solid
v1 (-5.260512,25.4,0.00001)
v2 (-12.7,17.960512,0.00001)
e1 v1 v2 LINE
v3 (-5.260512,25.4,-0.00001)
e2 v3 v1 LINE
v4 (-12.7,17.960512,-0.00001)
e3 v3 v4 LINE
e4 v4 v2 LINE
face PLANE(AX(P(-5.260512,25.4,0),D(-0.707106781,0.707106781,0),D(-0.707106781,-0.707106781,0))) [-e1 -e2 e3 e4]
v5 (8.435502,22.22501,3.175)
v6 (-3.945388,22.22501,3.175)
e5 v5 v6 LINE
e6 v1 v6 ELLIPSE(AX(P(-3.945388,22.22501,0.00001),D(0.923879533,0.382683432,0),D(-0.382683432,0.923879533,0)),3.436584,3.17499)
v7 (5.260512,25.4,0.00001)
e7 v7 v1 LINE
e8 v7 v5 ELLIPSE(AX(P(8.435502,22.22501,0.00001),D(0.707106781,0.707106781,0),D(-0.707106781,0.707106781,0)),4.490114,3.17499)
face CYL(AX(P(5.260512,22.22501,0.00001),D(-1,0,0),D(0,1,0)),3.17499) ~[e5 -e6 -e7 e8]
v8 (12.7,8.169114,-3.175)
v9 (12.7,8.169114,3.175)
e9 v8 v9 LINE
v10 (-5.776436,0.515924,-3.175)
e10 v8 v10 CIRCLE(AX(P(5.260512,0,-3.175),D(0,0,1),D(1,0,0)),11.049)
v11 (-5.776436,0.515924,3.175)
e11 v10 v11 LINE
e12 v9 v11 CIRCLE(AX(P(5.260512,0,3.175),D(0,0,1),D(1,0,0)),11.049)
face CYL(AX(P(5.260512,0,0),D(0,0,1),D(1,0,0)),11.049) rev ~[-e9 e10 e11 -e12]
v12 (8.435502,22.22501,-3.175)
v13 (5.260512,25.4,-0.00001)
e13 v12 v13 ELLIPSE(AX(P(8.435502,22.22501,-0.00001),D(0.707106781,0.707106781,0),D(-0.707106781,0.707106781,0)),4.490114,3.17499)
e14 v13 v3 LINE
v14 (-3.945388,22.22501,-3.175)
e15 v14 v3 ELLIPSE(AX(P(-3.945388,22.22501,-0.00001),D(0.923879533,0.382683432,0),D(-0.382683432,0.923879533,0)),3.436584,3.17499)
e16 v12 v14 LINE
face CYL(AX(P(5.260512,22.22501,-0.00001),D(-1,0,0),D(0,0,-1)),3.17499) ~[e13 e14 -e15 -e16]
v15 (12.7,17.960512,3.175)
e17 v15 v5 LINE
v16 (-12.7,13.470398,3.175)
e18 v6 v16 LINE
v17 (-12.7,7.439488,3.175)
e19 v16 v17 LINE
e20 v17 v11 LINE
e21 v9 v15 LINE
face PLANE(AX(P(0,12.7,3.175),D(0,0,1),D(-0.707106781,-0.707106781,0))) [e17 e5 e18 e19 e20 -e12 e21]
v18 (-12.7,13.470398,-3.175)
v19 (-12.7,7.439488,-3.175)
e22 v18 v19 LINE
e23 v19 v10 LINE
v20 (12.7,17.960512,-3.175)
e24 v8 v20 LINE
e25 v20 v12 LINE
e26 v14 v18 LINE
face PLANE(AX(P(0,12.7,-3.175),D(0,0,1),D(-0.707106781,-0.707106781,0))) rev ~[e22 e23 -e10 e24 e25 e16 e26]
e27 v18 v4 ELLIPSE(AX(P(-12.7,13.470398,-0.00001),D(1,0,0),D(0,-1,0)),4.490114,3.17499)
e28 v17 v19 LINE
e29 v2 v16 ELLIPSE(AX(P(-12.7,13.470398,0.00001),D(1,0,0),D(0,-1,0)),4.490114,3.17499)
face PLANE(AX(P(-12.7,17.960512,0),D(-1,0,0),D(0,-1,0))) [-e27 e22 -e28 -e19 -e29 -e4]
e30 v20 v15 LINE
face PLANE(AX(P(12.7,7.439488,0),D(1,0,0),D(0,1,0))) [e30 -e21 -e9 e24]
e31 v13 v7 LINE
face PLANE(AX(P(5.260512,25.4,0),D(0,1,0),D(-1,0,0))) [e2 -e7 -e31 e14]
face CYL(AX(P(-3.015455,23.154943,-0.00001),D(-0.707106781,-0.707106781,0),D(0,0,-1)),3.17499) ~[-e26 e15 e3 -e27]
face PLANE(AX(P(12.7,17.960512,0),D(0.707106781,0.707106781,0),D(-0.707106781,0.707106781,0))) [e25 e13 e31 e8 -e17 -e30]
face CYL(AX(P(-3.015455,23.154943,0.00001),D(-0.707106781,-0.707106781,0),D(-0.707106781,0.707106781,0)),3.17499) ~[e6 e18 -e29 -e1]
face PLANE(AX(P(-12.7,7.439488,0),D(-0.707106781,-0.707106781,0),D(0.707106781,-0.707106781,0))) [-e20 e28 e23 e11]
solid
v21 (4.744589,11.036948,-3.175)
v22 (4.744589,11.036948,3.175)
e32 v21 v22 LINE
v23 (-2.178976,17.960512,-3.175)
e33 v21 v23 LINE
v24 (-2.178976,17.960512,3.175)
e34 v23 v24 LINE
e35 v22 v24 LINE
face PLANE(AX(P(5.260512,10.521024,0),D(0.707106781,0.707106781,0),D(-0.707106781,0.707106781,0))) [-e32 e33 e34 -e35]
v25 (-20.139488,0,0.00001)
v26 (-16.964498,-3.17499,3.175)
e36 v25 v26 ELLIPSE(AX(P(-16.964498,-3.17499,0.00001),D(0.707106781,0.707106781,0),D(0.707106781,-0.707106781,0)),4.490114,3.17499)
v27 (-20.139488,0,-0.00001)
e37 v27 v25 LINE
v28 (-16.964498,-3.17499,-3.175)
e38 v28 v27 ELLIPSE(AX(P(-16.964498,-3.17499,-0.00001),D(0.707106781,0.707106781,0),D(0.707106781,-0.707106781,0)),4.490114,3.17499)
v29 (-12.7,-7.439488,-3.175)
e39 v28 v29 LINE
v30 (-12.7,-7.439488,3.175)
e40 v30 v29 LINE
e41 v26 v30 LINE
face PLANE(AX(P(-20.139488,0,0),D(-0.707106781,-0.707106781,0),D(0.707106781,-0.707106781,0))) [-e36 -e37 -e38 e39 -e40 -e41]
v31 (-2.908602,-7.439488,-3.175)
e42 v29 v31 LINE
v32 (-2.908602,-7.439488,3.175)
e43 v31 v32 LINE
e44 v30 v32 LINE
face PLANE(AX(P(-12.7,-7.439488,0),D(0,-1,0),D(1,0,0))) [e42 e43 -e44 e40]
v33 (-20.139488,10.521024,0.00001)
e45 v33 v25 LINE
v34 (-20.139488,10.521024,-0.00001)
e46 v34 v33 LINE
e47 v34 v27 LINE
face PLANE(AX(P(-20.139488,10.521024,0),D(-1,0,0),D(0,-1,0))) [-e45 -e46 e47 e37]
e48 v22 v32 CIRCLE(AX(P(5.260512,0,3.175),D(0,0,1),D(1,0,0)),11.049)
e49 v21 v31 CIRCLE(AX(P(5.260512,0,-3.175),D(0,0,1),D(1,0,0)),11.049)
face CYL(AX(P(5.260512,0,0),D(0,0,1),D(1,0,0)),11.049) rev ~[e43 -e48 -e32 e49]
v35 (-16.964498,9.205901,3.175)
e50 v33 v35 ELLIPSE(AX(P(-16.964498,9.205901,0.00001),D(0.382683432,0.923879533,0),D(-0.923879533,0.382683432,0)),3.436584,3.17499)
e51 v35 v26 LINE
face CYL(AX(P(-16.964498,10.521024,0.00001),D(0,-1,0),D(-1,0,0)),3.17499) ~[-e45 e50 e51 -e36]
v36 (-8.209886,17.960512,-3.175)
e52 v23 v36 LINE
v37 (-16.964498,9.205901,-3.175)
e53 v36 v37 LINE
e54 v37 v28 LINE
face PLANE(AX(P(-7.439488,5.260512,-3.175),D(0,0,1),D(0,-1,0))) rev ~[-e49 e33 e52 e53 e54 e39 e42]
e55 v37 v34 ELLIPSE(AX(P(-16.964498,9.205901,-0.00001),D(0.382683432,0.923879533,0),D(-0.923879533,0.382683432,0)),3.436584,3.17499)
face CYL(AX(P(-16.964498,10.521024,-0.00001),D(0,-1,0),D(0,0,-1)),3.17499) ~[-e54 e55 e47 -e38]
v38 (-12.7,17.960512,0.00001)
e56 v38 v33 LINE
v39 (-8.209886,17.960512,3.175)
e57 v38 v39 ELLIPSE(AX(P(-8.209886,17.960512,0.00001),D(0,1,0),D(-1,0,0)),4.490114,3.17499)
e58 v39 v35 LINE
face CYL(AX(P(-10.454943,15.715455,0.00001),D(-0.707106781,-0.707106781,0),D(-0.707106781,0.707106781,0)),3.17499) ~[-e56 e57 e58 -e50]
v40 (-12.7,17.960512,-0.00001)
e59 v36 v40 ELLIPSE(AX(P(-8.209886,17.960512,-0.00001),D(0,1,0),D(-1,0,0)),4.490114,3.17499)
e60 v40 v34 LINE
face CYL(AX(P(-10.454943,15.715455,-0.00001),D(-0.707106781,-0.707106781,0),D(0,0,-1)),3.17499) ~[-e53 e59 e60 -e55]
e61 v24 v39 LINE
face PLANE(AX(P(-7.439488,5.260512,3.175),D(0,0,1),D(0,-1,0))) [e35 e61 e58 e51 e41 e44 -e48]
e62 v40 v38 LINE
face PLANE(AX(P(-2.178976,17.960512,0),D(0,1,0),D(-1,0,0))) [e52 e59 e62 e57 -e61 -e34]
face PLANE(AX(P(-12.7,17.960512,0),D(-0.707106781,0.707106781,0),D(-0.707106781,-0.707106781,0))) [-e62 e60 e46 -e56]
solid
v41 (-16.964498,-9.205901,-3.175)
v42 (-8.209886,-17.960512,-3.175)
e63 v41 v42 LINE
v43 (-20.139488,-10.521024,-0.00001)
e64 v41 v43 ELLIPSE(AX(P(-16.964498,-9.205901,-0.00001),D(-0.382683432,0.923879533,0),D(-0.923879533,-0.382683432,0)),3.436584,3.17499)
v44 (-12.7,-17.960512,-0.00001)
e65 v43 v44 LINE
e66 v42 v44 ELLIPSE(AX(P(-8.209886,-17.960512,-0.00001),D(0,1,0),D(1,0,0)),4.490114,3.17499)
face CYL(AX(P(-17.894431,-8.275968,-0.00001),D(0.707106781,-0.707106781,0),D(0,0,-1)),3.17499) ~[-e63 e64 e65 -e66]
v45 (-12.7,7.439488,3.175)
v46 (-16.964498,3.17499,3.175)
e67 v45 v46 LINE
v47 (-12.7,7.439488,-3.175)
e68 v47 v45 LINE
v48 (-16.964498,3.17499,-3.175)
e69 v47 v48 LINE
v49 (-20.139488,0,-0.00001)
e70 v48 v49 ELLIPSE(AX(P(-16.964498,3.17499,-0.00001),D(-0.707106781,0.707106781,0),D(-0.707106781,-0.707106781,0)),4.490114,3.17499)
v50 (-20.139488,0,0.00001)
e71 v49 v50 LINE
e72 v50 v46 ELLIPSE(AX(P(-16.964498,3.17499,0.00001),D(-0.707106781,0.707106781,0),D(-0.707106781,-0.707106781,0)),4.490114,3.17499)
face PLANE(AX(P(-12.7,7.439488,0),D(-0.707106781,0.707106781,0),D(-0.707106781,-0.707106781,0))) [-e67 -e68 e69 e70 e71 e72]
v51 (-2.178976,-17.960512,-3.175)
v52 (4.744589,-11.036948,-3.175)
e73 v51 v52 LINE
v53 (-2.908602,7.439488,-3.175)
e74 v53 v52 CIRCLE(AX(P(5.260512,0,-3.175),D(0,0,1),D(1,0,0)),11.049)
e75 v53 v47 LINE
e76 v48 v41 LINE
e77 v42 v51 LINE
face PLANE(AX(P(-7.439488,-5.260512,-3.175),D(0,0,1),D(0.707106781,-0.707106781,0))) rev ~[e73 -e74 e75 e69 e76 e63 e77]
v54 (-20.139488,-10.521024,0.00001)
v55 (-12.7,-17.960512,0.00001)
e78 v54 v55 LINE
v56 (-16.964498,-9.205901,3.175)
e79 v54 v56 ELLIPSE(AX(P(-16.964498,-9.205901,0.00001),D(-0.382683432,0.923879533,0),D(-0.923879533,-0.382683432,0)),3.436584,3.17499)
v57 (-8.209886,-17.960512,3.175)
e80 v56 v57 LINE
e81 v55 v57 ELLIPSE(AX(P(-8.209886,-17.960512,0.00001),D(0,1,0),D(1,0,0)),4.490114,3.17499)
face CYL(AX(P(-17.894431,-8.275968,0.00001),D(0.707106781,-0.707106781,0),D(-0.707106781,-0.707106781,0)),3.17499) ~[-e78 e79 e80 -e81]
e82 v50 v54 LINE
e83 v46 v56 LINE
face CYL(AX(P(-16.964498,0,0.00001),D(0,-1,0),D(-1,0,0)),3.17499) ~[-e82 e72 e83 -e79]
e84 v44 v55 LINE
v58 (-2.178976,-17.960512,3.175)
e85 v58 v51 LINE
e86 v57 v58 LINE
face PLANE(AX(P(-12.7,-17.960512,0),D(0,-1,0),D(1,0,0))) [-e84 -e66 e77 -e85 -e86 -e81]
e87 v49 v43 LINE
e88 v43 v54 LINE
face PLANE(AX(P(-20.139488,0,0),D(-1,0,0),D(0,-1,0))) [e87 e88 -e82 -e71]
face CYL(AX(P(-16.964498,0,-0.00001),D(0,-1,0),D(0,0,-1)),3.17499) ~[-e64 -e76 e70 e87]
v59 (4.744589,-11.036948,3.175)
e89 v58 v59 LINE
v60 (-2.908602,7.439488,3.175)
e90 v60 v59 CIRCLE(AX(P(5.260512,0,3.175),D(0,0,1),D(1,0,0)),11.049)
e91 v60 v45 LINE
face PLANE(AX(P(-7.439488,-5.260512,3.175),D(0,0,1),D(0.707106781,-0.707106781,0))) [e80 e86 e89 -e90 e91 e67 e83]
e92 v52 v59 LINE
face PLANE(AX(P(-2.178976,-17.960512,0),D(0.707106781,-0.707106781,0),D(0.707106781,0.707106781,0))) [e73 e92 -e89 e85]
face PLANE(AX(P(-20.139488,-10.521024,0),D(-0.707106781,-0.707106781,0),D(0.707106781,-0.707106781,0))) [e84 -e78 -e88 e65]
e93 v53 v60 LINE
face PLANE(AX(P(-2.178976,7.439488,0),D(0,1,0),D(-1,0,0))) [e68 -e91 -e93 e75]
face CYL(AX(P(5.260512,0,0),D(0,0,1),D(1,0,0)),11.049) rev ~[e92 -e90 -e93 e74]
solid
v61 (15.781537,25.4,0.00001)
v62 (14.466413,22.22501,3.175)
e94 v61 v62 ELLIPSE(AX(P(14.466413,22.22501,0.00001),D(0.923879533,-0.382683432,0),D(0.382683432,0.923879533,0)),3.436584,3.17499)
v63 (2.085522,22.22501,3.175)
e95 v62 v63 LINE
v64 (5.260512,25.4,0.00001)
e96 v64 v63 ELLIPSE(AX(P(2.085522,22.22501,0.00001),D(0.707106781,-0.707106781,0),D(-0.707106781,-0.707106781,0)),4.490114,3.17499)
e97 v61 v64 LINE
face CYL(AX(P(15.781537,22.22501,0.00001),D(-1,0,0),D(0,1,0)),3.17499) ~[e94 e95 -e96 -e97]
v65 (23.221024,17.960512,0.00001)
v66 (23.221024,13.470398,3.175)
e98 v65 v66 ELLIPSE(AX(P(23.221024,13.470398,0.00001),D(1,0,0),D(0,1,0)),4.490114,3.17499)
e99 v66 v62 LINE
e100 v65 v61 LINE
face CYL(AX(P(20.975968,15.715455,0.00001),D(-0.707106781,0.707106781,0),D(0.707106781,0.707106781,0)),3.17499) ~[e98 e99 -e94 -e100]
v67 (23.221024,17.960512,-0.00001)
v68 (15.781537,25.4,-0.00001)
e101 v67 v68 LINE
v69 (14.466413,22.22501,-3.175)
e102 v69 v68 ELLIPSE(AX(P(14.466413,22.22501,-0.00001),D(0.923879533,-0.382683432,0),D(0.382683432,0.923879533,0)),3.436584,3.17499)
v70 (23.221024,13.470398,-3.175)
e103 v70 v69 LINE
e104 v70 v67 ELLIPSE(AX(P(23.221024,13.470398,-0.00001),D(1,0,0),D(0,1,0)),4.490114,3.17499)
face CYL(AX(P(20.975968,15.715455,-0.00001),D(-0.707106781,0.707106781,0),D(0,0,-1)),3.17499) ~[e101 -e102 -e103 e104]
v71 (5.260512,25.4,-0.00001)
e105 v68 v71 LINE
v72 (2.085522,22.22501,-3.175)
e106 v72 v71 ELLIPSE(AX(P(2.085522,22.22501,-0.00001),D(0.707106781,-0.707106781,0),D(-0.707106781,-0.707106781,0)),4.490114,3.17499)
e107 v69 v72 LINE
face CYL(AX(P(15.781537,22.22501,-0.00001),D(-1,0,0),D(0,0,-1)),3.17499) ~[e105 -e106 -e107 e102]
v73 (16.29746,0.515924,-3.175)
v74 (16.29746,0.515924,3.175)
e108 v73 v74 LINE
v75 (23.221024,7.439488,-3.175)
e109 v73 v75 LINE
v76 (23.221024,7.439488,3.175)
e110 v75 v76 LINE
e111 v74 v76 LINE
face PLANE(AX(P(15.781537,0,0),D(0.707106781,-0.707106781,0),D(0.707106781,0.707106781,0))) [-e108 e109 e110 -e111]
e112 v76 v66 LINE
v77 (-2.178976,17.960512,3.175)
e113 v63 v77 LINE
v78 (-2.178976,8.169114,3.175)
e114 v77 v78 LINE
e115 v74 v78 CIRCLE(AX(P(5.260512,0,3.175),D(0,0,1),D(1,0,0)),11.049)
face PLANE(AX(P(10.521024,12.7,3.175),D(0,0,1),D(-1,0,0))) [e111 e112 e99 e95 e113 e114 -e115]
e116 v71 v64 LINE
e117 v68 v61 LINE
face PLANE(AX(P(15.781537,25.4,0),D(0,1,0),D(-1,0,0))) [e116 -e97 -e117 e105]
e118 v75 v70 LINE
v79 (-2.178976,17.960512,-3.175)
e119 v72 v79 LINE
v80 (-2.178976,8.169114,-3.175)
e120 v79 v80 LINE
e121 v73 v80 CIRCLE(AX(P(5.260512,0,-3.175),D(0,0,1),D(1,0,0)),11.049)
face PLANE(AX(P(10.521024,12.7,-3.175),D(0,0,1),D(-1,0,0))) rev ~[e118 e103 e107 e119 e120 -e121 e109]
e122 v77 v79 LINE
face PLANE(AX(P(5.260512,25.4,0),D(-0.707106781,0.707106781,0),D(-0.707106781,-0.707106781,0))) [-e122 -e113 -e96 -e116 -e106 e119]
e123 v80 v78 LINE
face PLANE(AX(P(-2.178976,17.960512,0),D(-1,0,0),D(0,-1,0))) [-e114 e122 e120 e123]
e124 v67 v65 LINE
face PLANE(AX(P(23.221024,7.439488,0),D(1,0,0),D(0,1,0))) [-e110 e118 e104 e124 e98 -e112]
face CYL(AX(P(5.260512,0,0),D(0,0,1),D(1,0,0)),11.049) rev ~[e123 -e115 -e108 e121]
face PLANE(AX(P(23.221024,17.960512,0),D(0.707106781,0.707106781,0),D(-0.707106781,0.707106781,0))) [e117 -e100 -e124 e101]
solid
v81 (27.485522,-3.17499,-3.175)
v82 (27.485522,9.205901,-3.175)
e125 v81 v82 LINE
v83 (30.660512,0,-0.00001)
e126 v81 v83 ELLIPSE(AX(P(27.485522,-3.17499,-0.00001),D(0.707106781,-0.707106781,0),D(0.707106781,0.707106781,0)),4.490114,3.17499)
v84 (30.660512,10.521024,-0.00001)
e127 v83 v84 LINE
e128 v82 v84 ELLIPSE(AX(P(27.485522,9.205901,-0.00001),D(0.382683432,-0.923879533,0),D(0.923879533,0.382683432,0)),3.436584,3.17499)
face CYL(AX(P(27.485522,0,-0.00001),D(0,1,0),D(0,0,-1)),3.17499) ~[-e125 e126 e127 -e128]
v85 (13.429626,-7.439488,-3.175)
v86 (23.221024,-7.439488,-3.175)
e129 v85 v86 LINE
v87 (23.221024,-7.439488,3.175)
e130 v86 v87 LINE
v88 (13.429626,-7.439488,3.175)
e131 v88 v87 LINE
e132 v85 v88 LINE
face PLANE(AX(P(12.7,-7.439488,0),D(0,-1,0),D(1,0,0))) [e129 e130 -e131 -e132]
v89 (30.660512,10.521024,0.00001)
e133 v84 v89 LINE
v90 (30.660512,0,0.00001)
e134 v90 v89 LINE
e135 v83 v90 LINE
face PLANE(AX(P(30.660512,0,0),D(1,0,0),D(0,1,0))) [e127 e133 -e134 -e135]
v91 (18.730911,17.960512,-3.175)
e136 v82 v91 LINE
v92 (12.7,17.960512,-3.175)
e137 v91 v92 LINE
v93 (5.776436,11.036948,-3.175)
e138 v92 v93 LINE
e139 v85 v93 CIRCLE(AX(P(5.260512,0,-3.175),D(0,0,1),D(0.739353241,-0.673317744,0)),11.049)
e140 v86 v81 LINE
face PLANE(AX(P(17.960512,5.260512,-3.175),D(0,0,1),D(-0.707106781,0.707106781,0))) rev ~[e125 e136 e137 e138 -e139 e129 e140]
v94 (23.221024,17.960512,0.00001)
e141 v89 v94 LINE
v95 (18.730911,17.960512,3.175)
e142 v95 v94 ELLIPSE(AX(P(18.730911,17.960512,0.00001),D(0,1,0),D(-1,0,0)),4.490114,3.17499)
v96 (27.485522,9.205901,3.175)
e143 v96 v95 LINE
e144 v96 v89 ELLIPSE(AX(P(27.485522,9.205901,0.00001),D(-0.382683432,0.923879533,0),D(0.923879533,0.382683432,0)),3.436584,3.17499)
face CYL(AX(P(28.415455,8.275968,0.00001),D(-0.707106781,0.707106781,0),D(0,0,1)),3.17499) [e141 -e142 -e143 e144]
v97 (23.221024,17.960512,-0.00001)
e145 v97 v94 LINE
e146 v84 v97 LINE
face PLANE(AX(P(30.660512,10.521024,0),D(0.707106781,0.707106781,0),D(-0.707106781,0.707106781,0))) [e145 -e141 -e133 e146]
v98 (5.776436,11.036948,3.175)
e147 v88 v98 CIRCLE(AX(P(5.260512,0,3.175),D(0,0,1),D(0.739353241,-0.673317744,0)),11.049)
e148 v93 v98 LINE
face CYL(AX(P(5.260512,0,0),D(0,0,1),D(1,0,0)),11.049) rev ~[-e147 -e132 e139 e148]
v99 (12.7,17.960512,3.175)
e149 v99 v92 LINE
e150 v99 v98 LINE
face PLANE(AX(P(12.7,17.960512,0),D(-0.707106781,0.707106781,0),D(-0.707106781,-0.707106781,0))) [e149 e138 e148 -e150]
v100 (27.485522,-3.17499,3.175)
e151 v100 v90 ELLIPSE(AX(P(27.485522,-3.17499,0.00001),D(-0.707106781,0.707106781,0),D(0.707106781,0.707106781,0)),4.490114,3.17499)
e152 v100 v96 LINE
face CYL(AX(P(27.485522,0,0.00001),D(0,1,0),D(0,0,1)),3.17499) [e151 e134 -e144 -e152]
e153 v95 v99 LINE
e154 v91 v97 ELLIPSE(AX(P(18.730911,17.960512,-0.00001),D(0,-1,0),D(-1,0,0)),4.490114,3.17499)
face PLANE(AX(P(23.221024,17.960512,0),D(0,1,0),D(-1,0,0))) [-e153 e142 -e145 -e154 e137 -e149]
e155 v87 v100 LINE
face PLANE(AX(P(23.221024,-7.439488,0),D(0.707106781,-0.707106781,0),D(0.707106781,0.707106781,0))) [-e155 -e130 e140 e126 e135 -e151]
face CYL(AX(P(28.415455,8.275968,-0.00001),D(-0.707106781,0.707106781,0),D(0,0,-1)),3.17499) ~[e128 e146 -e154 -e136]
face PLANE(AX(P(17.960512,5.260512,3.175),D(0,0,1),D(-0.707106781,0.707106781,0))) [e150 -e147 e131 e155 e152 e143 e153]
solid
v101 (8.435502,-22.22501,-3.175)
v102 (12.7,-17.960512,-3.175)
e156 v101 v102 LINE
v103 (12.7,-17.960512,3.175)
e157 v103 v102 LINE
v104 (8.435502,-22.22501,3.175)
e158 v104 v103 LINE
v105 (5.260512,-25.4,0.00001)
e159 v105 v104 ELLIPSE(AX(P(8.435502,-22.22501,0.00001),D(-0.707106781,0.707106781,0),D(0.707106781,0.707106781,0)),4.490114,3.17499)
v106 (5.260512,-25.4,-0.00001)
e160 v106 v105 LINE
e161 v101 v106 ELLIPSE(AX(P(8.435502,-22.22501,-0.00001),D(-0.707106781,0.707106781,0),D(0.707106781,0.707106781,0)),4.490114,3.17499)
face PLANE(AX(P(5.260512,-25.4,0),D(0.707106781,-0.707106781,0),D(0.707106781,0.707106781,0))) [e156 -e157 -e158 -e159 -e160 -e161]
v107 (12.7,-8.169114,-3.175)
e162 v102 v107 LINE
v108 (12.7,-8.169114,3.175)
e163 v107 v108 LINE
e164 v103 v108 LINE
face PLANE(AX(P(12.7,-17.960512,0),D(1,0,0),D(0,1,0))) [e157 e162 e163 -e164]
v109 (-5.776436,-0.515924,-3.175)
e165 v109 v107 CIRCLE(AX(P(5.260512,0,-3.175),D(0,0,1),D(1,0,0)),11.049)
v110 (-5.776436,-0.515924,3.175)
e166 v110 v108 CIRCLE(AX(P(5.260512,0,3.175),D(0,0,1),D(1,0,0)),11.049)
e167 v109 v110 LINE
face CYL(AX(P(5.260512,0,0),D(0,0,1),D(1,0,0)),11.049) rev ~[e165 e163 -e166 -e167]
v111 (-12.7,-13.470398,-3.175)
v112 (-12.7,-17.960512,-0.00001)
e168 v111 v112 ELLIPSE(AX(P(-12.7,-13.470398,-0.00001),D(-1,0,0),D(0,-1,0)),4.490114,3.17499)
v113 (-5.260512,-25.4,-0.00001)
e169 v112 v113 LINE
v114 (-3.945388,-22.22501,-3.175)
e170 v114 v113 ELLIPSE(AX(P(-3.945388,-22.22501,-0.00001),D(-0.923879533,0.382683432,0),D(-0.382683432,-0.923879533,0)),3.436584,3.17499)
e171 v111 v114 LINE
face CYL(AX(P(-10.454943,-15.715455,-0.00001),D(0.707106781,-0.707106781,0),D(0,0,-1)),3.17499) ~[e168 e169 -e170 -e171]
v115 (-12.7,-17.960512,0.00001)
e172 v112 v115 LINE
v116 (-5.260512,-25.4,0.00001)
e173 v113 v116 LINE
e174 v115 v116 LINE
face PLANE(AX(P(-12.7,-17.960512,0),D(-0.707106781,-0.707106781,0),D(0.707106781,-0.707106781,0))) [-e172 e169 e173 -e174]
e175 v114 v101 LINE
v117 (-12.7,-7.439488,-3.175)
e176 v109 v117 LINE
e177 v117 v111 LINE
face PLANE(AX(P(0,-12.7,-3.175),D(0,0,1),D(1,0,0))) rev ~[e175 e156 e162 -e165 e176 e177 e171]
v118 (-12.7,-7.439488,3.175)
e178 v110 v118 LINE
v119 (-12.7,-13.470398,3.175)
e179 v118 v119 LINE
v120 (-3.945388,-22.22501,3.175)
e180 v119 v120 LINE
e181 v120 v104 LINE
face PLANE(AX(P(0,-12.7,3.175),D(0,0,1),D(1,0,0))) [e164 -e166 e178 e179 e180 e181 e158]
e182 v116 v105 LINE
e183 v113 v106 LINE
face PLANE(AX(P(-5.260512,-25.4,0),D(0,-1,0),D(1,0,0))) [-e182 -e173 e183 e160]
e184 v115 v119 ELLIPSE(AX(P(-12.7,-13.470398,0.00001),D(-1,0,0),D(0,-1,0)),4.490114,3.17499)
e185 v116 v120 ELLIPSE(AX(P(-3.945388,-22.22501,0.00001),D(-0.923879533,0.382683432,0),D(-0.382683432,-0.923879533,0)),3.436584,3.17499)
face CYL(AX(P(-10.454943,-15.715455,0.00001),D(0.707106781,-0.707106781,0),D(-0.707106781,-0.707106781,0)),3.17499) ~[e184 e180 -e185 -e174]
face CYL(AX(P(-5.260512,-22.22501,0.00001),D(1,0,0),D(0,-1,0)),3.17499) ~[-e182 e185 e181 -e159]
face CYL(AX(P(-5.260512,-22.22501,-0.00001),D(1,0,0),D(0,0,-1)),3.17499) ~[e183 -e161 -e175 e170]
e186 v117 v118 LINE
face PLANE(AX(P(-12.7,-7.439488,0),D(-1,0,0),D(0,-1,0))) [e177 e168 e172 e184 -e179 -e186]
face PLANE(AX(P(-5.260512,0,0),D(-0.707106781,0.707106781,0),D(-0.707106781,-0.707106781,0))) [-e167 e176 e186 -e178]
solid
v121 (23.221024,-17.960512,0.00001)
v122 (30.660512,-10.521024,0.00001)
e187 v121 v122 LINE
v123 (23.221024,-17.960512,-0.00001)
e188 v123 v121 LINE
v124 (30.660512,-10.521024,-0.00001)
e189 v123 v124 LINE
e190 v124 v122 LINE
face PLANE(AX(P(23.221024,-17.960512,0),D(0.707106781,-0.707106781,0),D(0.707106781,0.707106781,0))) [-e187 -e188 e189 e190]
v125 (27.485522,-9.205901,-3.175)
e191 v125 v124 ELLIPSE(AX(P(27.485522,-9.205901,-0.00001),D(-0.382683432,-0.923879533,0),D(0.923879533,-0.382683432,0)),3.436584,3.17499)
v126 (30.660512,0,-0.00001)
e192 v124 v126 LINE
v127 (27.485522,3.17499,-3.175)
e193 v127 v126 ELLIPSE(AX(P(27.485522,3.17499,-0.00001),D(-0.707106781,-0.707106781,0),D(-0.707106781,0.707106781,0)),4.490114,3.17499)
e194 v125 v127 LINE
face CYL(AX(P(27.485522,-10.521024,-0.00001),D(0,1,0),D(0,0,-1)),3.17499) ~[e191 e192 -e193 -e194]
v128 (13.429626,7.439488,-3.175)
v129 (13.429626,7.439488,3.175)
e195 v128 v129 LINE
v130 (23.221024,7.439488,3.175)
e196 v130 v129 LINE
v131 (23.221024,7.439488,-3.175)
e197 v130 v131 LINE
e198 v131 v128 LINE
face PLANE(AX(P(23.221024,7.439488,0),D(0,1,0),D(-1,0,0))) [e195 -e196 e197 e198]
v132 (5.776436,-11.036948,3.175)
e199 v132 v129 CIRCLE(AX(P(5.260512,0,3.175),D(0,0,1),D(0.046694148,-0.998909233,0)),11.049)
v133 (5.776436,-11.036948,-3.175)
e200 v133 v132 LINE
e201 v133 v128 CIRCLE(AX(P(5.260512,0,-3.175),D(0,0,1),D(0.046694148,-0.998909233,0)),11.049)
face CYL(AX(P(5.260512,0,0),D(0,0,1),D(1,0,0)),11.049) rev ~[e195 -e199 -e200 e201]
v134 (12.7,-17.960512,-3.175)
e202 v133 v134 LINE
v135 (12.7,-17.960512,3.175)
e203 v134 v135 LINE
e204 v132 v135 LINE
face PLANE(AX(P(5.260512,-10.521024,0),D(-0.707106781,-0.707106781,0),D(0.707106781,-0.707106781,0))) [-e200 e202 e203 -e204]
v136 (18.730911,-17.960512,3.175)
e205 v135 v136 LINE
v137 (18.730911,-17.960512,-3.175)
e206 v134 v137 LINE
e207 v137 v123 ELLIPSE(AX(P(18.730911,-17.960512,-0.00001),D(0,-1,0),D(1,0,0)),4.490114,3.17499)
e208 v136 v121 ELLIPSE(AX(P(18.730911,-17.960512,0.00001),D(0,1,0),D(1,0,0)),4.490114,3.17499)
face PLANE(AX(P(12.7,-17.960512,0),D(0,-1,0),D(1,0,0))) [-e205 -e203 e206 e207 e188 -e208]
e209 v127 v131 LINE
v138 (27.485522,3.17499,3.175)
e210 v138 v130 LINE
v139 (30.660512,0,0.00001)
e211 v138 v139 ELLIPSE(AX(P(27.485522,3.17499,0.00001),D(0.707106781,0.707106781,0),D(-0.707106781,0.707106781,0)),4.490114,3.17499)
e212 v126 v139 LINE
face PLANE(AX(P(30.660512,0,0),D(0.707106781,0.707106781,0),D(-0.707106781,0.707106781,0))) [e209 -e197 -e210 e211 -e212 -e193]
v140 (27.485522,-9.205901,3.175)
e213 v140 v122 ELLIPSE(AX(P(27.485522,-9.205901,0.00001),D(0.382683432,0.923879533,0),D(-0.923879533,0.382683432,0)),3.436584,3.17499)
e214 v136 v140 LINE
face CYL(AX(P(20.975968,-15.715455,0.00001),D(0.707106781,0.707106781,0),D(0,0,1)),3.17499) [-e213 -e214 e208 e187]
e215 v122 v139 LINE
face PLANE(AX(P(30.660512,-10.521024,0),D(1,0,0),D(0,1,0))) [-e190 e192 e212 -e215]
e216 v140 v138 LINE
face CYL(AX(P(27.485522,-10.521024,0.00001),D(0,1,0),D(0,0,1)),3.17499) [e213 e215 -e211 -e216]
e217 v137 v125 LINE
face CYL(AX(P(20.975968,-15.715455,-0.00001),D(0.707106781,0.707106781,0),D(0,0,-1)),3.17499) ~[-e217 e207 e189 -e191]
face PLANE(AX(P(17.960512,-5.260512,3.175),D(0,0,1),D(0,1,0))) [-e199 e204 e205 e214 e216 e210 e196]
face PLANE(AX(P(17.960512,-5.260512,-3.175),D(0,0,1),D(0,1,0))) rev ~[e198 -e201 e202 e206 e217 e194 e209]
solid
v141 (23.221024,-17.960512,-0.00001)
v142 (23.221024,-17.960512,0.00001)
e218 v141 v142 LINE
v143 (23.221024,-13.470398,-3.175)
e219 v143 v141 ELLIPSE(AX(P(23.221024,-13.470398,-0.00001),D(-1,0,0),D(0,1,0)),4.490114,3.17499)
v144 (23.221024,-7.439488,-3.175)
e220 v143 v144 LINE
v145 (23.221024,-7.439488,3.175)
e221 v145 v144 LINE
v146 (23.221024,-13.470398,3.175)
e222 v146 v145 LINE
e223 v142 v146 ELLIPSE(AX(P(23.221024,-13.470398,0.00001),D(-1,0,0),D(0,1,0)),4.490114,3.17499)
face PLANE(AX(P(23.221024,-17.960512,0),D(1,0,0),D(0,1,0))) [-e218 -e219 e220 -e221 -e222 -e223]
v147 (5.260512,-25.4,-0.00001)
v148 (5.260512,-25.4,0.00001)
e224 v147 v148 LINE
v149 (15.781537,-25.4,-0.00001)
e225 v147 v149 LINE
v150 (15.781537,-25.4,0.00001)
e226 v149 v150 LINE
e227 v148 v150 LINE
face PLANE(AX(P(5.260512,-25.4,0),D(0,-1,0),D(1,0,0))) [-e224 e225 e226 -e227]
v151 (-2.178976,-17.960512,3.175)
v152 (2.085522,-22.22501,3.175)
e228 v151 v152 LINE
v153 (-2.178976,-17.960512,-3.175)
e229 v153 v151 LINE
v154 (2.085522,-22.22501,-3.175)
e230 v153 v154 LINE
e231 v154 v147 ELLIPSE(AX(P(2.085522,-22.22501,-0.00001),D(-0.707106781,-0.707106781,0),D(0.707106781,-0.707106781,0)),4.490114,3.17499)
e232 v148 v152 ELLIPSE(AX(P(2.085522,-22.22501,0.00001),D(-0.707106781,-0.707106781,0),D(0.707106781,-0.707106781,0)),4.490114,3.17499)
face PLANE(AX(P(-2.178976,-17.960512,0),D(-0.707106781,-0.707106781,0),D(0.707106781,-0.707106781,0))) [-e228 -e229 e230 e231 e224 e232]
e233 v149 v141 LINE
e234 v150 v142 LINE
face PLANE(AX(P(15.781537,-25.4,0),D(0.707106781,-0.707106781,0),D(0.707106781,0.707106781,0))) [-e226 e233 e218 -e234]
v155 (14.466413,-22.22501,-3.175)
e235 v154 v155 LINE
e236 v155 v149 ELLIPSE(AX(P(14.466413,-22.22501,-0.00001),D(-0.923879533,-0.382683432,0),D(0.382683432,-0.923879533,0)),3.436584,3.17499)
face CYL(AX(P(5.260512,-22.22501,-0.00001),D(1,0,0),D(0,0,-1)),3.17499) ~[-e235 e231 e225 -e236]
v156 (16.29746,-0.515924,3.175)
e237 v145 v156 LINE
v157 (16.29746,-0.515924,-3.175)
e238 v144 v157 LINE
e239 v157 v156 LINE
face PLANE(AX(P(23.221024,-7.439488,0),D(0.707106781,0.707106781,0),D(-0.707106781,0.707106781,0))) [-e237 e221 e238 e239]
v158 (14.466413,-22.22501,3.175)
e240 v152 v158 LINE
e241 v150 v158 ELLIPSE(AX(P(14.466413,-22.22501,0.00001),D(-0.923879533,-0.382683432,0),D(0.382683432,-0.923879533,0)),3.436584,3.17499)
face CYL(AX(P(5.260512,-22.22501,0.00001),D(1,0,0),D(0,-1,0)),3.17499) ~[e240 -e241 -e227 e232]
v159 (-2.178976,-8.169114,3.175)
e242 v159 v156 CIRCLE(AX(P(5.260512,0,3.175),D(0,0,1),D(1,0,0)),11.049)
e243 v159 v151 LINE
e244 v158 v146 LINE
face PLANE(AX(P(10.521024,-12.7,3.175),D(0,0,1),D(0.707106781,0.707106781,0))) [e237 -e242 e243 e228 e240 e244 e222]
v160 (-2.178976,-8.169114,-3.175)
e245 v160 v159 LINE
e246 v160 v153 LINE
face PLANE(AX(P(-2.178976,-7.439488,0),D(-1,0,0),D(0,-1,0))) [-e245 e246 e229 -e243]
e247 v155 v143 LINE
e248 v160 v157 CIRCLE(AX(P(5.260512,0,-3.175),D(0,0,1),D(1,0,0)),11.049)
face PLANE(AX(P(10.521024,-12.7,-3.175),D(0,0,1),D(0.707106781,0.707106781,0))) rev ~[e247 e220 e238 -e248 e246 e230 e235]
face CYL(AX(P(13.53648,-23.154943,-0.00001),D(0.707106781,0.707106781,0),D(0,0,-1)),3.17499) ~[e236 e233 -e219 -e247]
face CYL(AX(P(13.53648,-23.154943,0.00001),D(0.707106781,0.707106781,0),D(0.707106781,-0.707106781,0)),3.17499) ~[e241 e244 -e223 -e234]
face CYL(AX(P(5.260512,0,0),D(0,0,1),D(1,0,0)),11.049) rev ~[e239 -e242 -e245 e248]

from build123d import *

# Parameters (mm, degrees)
F1_DEPTH = 3.175
F2_COUNT = 8
F3_R     = 11.049
F4_DEPTH = 12.7
F5_R     = 3.17499
F5_2_R   = 3.17499
F5_3_R   = 3.17499
F5_4_R   = 3.17499
F5_5_R   = 3.17499
F5_6_R   = 3.17499
F5_7_R   = 3.17499
F5_8_R   = 3.17499


# Not quite as in the source:
# - a fillet or chamfer is up to 0.001 mm smaller than in the source, because OpenCascade refuses the exact size


with BuildPart() as f1:
    # F0 (on Top) → F1 (new body, symmetric)
    with BuildSketch(Plane.XY):
        Polygon((5.2605122421, 0), (-5.2605122421, 0), (-12.7, -7.4394877579), (-12.7, -17.9605122421), (-5.2605122421, -25.4), (5.2605122421, -25.4), (12.7, -17.9605122421), (12.7, -7.4394877579), align=None)
    extrude(amount=F1_DEPTH, both=True)


with BuildPart() as f2_1:
    # F2: instance of F1
    add(f1.part.rotate(Axis((5.2605122421, 0, 0), (0, 0, 1)), 1 * 360 / F2_COUNT))


with BuildPart() as f2_2:
    # F2: instance of F1
    add(f1.part.rotate(Axis((5.2605122421, 0, 0), (0, 0, 1)), 2 * 360 / F2_COUNT))


with BuildPart() as f2_3:
    # F2: instance of F1
    add(f1.part.rotate(Axis((5.2605122421, 0, 0), (0, 0, 1)), 3 * 360 / F2_COUNT))


with BuildPart() as f2_4:
    # F2: instance of F1
    add(f1.part.rotate(Axis((5.2605122421, 0, 0), (0, 0, 1)), 4 * 360 / F2_COUNT))


with BuildPart() as f2_5:
    # F2: instance of F1
    add(f1.part.rotate(Axis((5.2605122421, 0, 0), (0, 0, 1)), 5 * 360 / F2_COUNT))


with BuildPart() as f2_6:
    # F2: instance of F1
    add(f1.part.rotate(Axis((5.2605122421, 0, 0), (0, 0, 1)), 6 * 360 / F2_COUNT))


with BuildPart() as f2_7:
    # F2: instance of F1
    add(f1.part.rotate(Axis((5.2605122421, 0, 0), (0, 0, 1)), 7 * 360 / F2_COUNT))


with BuildPart() as f4_tool:
    # F3 (on Top) → F4 (new body, symmetric)
    with BuildSketch(Plane.XY):
        with Locations((5.2605122421, 0)):
            Circle(F3_R)
    extrude(amount=F4_DEPTH, both=True)


with BuildPart() as f1_1:
    add(f1.part)

    # F4: cut by f4_tool
    add(f4_tool.part, mode=Mode.SUBTRACT)

    # F5#7 (radius 3.175 in the source; OpenCascade refuses exactly that, so slightly less here)
    f5_7_edges = [f1_1.edges().sort_by_distance(p)[0] for p in [
        (-8.980256, -21.680256, 3.175),
        (0, -25.4, 3.175),
        (-8.980256, -21.680256, -3.175),
        (0, -25.4, -3.175),
    ]]
    fillet(f5_7_edges, radius=F5_7_R)


with BuildPart() as f2_1_1:
    add(f2_1.part)

    # F4: cut by f4_tool
    add(f4_tool.part, mode=Mode.SUBTRACT)

    # F5#8 (radius 3.175 in the source; OpenCascade refuses exactly that, so slightly less here)
    f5_8_edges = [f2_1_1.edges().sort_by_distance(p)[0] for p in [
        (10.521024, -25.4, 3.175),
        (19.501281, -21.680256, 3.175),
        (10.521024, -25.4, -3.175),
        (19.501281, -21.680256, -3.175),
    ]]
    fillet(f5_8_edges, radius=F5_8_R)


with BuildPart() as f2_2_1:
    add(f2_2.part)

    # F4: cut by f4_tool
    add(f4_tool.part, mode=Mode.SUBTRACT)

    # F5 (radius 3.175 in the source; OpenCascade refuses exactly that, so slightly less here)
    f5_edges = [f2_2_1.edges().sort_by_distance(p)[0] for p in [
        (30.660512, -5.260512, 3.175),
        (26.940768, -14.240768, 3.175),
        (26.940768, -14.240768, -3.175),
        (30.660512, -5.260512, -3.175),
    ]]
    fillet(f5_edges, radius=F5_R)


with BuildPart() as f2_3_1:
    add(f2_3.part)

    # F4: cut by f4_tool
    add(f4_tool.part, mode=Mode.SUBTRACT)

    # F5#2 (radius 3.175 in the source; OpenCascade refuses exactly that, so slightly less here)
    f5_2_edges = [f2_3_1.edges().sort_by_distance(p)[0] for p in [
        (30.660512, 5.260512, 3.175),
        (26.940768, 14.240768, 3.175),
        (30.660512, 5.260512, -3.175),
        (26.940768, 14.240768, -3.175),
    ]]
    fillet(f5_2_edges, radius=F5_2_R)


with BuildPart() as f2_4_1:
    add(f2_4.part)

    # F4: cut by f4_tool
    add(f4_tool.part, mode=Mode.SUBTRACT)

    # F5#3 (radius 3.175 in the source; OpenCascade refuses exactly that, so slightly less here)
    f5_3_edges = [f2_4_1.edges().sort_by_distance(p)[0] for p in [
        (19.501281, 21.680256, 3.175),
        (10.521024, 25.4, 3.175),
        (19.501281, 21.680256, -3.175),
        (10.521024, 25.4, -3.175),
    ]]
    fillet(f5_3_edges, radius=F5_3_R)


with BuildPart() as f2_5_1:
    add(f2_5.part)

    # F4: cut by f4_tool
    add(f4_tool.part, mode=Mode.SUBTRACT)

    # F5#4 (radius 3.175 in the source; OpenCascade refuses exactly that, so slightly less here)
    f5_4_edges = [f2_5_1.edges().sort_by_distance(p)[0] for p in [
        (0, 25.4, 3.175),
        (-8.980256, 21.680256, 3.175),
        (0, 25.4, -3.175),
        (-8.980256, 21.680256, -3.175),
    ]]
    fillet(f5_4_edges, radius=F5_4_R)


with BuildPart() as f2_6_1:
    add(f2_6.part)

    # F4: cut by f4_tool
    add(f4_tool.part, mode=Mode.SUBTRACT)

    # F5#5 (radius 3.175 in the source; OpenCascade refuses exactly that, so slightly less here)
    f5_5_edges = [f2_6_1.edges().sort_by_distance(p)[0] for p in [
        (-16.419744, 14.240768, 3.175),
        (-20.139488, 5.260512, 3.175),
        (-16.419744, 14.240768, -3.175),
        (-20.139488, 5.260512, -3.175),
    ]]
    fillet(f5_5_edges, radius=F5_5_R)


with BuildPart() as f2_7_1:
    add(f2_7.part)

    # F4: cut by f4_tool
    add(f4_tool.part, mode=Mode.SUBTRACT)

    # F5#6 (radius 3.175 in the source; OpenCascade refuses exactly that, so slightly less here)
    f5_6_edges = [f2_7_1.edges().sort_by_distance(p)[0] for p in [
        (-20.139488, -5.260512, 3.175),
        (-16.419744, -14.240768, 3.175),
        (-20.139488, -5.260512, -3.175),
        (-16.419744, -14.240768, -3.175),
    ]]
    fillet(f5_6_edges, radius=F5_6_R)


solid = Compound([f1_1.part, f2_1_1.part, f2_2_1.part, f2_3_1.part, f2_4_1.part, f2_5_1.part, f2_6_1.part, f2_7_1.part])
